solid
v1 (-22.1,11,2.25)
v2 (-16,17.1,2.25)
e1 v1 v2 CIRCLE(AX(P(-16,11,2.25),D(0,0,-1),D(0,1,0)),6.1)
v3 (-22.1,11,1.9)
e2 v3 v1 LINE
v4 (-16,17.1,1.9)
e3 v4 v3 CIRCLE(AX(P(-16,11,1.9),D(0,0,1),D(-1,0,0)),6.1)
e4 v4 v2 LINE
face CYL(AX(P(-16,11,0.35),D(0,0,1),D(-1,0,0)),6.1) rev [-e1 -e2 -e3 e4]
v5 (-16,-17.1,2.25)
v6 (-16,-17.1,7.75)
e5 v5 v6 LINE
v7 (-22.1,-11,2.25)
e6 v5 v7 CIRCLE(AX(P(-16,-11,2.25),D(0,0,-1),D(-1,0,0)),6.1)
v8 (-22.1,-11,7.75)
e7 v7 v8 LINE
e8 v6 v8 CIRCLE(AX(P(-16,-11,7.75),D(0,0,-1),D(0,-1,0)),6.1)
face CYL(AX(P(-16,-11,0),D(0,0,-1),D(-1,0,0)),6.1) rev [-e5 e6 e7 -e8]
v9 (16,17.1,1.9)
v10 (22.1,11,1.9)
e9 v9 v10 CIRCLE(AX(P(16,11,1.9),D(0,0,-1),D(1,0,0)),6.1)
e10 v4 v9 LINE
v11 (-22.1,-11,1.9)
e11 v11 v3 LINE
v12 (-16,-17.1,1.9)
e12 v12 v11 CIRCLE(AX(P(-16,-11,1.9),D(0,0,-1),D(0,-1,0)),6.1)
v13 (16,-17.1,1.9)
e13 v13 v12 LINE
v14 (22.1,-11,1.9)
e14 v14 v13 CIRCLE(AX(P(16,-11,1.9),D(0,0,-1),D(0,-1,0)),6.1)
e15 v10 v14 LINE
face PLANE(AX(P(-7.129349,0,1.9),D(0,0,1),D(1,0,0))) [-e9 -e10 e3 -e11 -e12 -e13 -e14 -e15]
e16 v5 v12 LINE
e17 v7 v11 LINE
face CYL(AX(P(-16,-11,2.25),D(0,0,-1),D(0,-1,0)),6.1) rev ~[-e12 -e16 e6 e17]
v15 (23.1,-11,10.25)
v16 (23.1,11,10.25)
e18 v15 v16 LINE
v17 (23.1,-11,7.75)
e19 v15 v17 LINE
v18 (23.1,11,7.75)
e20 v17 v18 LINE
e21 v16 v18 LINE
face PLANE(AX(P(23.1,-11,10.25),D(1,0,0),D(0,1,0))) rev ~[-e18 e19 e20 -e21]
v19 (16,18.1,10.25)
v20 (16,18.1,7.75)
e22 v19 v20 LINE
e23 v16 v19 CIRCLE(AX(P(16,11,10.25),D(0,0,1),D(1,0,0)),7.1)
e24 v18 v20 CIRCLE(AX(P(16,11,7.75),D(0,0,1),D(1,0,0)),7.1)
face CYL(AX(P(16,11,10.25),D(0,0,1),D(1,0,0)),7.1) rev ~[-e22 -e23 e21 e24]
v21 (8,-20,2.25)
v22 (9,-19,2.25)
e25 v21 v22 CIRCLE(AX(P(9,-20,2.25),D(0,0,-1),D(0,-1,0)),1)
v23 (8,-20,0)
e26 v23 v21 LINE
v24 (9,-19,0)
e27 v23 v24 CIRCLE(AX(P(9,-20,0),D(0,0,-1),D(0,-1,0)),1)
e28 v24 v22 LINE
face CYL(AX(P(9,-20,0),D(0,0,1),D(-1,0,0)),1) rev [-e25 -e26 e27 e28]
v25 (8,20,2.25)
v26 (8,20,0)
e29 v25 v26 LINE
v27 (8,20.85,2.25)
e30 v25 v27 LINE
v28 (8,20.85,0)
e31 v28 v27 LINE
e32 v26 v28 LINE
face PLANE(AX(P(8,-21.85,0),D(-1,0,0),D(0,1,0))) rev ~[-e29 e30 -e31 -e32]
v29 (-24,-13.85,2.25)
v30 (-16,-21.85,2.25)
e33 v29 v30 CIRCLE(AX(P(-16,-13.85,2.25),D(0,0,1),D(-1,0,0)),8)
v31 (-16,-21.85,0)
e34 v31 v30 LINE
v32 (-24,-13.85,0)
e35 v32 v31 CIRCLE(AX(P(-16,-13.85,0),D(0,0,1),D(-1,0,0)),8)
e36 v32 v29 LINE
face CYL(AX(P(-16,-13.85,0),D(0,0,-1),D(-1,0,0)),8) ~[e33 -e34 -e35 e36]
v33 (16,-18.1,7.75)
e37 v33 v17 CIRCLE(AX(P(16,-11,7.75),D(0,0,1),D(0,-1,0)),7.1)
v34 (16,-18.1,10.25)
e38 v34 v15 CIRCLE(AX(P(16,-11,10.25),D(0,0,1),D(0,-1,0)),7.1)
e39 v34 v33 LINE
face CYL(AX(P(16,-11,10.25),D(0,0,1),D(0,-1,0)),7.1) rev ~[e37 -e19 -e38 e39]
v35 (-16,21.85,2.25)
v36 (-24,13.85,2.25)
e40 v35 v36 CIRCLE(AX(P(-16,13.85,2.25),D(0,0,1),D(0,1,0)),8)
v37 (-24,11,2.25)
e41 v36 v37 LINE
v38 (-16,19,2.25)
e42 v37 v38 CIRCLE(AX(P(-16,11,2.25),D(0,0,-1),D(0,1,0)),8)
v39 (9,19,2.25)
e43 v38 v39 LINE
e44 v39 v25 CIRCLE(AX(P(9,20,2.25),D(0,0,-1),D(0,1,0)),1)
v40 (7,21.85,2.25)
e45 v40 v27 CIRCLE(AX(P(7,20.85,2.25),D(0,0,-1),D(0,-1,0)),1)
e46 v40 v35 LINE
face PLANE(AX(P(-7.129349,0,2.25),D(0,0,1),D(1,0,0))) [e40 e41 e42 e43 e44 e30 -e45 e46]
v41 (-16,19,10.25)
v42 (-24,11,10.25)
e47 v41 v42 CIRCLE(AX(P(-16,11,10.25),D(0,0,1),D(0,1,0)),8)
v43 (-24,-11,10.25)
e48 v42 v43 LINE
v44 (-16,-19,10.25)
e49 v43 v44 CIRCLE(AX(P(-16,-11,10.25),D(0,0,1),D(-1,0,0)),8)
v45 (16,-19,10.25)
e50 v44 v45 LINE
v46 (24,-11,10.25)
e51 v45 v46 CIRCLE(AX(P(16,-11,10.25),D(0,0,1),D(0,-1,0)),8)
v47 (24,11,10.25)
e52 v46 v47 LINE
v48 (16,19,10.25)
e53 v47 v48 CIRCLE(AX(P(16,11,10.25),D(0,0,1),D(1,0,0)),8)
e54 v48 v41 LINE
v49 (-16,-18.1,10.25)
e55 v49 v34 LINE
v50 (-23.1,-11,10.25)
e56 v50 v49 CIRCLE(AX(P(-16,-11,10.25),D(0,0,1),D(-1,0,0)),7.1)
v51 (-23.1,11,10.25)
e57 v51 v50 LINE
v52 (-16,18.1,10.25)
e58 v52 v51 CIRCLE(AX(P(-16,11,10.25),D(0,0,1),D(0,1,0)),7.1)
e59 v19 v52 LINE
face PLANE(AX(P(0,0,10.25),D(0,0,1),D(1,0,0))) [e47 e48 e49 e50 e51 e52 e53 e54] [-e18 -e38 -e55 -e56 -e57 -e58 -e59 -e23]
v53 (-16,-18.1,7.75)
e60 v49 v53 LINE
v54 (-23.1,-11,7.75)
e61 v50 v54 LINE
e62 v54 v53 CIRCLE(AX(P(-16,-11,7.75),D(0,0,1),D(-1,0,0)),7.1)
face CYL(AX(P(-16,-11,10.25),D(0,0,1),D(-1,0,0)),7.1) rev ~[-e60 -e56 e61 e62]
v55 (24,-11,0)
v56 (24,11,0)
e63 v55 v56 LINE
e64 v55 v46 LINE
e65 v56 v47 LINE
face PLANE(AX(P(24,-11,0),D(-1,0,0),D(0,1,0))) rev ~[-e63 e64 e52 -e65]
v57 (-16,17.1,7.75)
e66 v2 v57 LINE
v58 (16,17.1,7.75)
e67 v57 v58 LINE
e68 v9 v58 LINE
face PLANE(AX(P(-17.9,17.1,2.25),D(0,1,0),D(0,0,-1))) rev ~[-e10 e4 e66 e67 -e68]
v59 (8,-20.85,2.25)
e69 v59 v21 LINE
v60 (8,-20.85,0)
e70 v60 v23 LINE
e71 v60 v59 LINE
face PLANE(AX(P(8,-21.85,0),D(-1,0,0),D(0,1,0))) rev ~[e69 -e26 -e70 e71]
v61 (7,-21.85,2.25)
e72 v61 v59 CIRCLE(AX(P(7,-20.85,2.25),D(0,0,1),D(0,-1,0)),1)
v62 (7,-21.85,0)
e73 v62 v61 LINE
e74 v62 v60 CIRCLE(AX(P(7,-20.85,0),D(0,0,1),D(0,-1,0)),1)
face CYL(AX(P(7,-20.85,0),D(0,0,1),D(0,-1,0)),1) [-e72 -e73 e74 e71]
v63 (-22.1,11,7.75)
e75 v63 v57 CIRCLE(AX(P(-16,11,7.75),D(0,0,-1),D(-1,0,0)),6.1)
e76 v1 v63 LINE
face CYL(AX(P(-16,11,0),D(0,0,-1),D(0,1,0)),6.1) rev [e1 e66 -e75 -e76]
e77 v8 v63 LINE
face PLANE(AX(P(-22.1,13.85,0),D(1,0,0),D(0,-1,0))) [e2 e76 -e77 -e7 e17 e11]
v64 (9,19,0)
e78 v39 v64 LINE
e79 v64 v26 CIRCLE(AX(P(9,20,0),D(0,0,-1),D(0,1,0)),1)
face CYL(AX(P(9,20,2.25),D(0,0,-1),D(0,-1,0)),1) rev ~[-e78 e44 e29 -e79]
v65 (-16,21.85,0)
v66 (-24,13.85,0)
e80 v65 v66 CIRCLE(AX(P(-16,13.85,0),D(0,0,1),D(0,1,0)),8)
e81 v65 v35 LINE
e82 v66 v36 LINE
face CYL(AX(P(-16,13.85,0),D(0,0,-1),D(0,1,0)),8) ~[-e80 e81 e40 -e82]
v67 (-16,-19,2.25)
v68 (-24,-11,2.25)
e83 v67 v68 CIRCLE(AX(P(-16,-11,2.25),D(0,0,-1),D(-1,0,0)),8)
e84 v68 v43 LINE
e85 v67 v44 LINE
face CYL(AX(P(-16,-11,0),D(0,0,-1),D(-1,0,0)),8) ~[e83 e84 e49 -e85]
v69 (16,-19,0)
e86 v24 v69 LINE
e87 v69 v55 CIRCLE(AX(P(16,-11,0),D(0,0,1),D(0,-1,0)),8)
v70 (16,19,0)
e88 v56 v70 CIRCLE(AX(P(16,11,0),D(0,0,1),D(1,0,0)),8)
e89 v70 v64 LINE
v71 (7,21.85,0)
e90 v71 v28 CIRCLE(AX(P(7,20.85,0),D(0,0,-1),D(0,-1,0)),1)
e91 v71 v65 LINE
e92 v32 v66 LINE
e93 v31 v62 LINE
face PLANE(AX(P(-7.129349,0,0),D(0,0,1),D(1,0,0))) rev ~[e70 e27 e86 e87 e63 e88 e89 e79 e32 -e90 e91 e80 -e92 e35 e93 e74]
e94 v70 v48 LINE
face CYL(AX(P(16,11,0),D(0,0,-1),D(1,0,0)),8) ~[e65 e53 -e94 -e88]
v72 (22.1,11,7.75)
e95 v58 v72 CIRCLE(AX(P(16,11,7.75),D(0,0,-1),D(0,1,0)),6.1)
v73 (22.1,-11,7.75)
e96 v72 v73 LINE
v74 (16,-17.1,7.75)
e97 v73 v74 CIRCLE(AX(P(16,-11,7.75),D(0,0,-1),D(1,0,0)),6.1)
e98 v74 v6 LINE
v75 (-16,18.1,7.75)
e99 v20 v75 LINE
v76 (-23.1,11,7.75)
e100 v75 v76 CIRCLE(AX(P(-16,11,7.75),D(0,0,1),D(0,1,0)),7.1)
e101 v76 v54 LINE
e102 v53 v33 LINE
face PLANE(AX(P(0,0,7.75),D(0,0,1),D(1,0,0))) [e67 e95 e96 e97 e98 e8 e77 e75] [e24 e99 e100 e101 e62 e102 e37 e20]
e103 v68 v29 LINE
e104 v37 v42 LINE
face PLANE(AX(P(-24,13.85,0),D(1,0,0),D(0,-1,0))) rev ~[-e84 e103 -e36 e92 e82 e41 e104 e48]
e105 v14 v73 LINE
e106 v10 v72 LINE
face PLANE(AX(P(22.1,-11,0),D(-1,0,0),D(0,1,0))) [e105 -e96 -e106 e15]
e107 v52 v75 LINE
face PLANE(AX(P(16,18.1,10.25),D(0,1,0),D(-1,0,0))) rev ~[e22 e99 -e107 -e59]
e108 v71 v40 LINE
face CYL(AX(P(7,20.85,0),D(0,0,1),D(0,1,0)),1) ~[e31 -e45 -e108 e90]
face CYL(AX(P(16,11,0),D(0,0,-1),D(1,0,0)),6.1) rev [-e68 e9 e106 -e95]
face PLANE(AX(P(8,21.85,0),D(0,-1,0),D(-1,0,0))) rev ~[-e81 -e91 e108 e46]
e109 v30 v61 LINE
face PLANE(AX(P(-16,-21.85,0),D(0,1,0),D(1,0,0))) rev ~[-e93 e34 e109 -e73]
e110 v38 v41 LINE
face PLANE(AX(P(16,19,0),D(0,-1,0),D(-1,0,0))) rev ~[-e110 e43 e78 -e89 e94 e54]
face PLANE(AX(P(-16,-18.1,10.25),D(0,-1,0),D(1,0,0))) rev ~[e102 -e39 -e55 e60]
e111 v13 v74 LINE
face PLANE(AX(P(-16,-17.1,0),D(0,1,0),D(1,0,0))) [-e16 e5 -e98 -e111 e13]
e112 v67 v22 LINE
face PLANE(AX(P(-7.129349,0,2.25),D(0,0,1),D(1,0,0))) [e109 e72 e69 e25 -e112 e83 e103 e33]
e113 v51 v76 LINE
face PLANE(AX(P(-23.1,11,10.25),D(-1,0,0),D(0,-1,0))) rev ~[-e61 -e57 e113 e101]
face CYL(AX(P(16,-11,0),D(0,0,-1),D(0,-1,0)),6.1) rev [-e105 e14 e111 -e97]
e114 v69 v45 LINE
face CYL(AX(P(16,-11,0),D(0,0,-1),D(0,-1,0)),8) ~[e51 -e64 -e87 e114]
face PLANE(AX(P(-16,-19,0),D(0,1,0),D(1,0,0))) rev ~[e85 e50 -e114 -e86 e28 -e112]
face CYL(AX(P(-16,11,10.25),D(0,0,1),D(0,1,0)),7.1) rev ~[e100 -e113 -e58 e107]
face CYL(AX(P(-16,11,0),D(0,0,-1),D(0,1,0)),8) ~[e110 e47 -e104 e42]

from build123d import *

# Parameters (mm, degrees)
F1_DEPTH     = 10.25
F3_DEPTH     = 2.25
F4_R         = 1
F5_T         = 1.9
F5_T3_DEPTH  = 4.8
F5_T5_DEPTH  = 27.8
F5_T8_ANGLE  = 90.000000001
F5_T10_ANGLE = 90.000000001
F7_DEPTH     = 2.5


# Not quite as in the source:
# - a shell that OpenCascade refuses in one call is made with other operations: the cavity is built on its own and cut out


with BuildPart() as f1:
    # F0 (on Top) → F1 (new body)
    with BuildSketch(Plane.XY):
        with BuildLine():
            Line((16, 19), (-16, 19))
            ThreePointArc((-16, 19), (-21.6568542495, 16.6568542495), (-24, 11))
            Line((-24, 11), (-24, -11))
            ThreePointArc((-24, -11), (-21.6568542495, -16.6568542495), (-16, -19))
            Line((-16, -19), (16, -19))
            ThreePointArc((16, -19), (21.6568542495, -16.6568542495), (24, -11))
            Line((24, -11), (24, 11))
            ThreePointArc((24, 11), (21.6568542495, 16.6568542495), (16, 19))
        make_face()
    extrude(amount=F1_DEPTH)

    # F2 (on Top) → F3 (join)
    with BuildSketch(Plane.XY):
        with BuildLine():
            Line((8, 21.85), (-16, 21.85))
            ThreePointArc((-16, 21.85), (-21.6568542495, 19.5068542495), (-24, 13.85))
            Line((-24, 13.85), (-24, -13.85))
            ThreePointArc((-24, -13.85), (-21.6568542495, -19.5068542495), (-16, -21.85))
            Line((-16, -21.85), (8, -21.85))
            Line((8, -21.85), (8, 21.85))
        make_face()
    extrude(amount=F3_DEPTH)

    # F4
    f4_edges = [f1.edges().sort_by_distance(p)[0] for p in [
        (8, 21.85, 1.125),
        (8, 19, 1.125),
        (8, -19, 1.125),
        (8, -21.85, 1.125),
    ]]
    fillet(f4_edges, radius=F4_R)

    # F5: shell of thickness 1.9, made by hand


with BuildPart() as f5_core1:
    # F5_t2: copy of F1
    add(f1.part)

    # the walls: a layer under each face that stays
    f5_faces = [f5_core1.faces().sort_by_distance(p)[0] for p in [
        (0, 19, 5.125),
        (0, 0, 0),
        (8.2928932188, 19.2928932188, 1.125),
        (21.6568542495, 16.6568542495, 5.125),
        (-18.5, 20.0416666667, 2.25),
        (-21.6568542495, 16.6568542495, 6.25),
        (8, 20.425, 1.125),
        (24, 0, 5.125),
        (21.6568542495, -16.6568542495, 5.125),
        (-4.5, 21.85, 1.125),
        (0, -19, 5.125),
        (-21.6568542495, 19.5068542495, 1.125),
        (8.2928932188, -19.2928932188, 1.125),
        (-24, 0, 5.125),
        (8, -20.425, 1.125),
        (-21.6568542495, -19.5068542495, 1.125),
        (-4.5, -21.85, 1.125),
        (-21.6568542495, -16.6568542495, 6.25),
        (-18.5, -20.0416666667, 2.25),
    ]]
    thicken(f5_faces, amount=-F5_T, mode=Mode.SUBTRACT)

    # F5_s4 → F5_t3 (cut)
    with BuildSketch(Plane.YZ.offset(6.1)):
        Polygon((19.019, 2.269), (17.1, 2.25), (17.1, 0.35), (19, 0.35), align=None)
        Polygon((-19.019, 2.269), (-17.1, 2.25), (-17.1, 0.35), (-19, 0.35), align=None)
    extrude(amount=F5_T3_DEPTH, mode=Mode.SUBTRACT)

    # F5_s6 → F5_t5 (cut)
    with BuildSketch(Plane.YZ.offset(-17.9)):
        Polygon((19.019, 2.269), (17.1, 2.25), (17.1, 0.35), (19, 0.35), align=None)
        Polygon((-19.019, 2.269), (-17.1, 2.25), (-17.1, 0.35), (-19, 0.35), align=None)
    extrude(amount=F5_T5_DEPTH, mode=Mode.SUBTRACT)

    # F5_s7 → F5_t8 (revolve, cut)
    with BuildSketch(Plane.XZ.offset(-11)):
        Polygon((-24.019, 2.269), (-24, 0.35), (-22.1, 0.35), (-22.1, 2.25), align=None)
    revolve(axis=Axis((-16, 11, 2.25), (0, 0, -1)), revolution_arc=F5_T8_ANGLE, mode=Mode.SUBTRACT)

    # F5_s9 → F5_t10 (revolve, cut)
    with BuildSketch(Plane.YZ.offset(-16)):
        Polygon((-19.019, 2.269), (-17.1, 2.25), (-17.1, 0.35), (-19, 0.35), align=None)
    revolve(axis=Axis((-16, -11, 2.25), (0, 0, -1)), revolution_arc=F5_T10_ANGLE, mode=Mode.SUBTRACT)


with BuildPart() as f1_1:
    add(f1.part)

    # what is left inside the walls is the cavity
    f5_cavity = [f5_core1.part.solids().sort_by_distance(p)[0] for p in [
        (0, -5.7, 10.231),
    ]]
    add(f5_cavity, mode=Mode.SUBTRACT)

    # F6 (on face) → F7 (cut)
    with BuildSketch(Plane.XY.offset(10.25)):
        with BuildLine():
            Line((23.1, -11), (23.1, 11))
            ThreePointArc((23.1, 11), (21.0204581464, 16.0204581464), (16, 18.1))
            Line((16, 18.1), (-16, 18.1))
            ThreePointArc((-16, 18.1), (-21.0204581464, 16.0204581464), (-23.1, 11))
            Line((-23.1, 11), (-23.1, -11))
            ThreePointArc((-23.1, -11), (-21.0204581464, -16.0204581464), (-16, -18.1))
            Line((-16, -18.1), (16, -18.1))
            ThreePointArc((16, -18.1), (21.0204581464, -16.0204581464), (23.1, -11))
        make_face()
        with BuildLine():
            Line((-22.1, -11), (-22.1, 11))
            ThreePointArc((-22.1, 11), (-20.3133513652, 15.3133513652), (-16, 17.1))
            Line((-16, 17.1), (16, 17.1))
            ThreePointArc((16, 17.1), (20.3133513652, 15.3133513652), (22.1, 11))
            Line((22.1, 11), (22.1, -11))
            ThreePointArc((22.1, -11), (20.3133513652, -15.3133513652), (16, -17.1))
            Line((16, -17.1), (-16, -17.1))
            ThreePointArc((-16, -17.1), (-20.3133513652, -15.3133513652), (-22.1, -11))
        make_face(mode=Mode.SUBTRACT)
    extrude(amount=-F7_DEPTH, mode=Mode.SUBTRACT)


solid = f1_1.part
